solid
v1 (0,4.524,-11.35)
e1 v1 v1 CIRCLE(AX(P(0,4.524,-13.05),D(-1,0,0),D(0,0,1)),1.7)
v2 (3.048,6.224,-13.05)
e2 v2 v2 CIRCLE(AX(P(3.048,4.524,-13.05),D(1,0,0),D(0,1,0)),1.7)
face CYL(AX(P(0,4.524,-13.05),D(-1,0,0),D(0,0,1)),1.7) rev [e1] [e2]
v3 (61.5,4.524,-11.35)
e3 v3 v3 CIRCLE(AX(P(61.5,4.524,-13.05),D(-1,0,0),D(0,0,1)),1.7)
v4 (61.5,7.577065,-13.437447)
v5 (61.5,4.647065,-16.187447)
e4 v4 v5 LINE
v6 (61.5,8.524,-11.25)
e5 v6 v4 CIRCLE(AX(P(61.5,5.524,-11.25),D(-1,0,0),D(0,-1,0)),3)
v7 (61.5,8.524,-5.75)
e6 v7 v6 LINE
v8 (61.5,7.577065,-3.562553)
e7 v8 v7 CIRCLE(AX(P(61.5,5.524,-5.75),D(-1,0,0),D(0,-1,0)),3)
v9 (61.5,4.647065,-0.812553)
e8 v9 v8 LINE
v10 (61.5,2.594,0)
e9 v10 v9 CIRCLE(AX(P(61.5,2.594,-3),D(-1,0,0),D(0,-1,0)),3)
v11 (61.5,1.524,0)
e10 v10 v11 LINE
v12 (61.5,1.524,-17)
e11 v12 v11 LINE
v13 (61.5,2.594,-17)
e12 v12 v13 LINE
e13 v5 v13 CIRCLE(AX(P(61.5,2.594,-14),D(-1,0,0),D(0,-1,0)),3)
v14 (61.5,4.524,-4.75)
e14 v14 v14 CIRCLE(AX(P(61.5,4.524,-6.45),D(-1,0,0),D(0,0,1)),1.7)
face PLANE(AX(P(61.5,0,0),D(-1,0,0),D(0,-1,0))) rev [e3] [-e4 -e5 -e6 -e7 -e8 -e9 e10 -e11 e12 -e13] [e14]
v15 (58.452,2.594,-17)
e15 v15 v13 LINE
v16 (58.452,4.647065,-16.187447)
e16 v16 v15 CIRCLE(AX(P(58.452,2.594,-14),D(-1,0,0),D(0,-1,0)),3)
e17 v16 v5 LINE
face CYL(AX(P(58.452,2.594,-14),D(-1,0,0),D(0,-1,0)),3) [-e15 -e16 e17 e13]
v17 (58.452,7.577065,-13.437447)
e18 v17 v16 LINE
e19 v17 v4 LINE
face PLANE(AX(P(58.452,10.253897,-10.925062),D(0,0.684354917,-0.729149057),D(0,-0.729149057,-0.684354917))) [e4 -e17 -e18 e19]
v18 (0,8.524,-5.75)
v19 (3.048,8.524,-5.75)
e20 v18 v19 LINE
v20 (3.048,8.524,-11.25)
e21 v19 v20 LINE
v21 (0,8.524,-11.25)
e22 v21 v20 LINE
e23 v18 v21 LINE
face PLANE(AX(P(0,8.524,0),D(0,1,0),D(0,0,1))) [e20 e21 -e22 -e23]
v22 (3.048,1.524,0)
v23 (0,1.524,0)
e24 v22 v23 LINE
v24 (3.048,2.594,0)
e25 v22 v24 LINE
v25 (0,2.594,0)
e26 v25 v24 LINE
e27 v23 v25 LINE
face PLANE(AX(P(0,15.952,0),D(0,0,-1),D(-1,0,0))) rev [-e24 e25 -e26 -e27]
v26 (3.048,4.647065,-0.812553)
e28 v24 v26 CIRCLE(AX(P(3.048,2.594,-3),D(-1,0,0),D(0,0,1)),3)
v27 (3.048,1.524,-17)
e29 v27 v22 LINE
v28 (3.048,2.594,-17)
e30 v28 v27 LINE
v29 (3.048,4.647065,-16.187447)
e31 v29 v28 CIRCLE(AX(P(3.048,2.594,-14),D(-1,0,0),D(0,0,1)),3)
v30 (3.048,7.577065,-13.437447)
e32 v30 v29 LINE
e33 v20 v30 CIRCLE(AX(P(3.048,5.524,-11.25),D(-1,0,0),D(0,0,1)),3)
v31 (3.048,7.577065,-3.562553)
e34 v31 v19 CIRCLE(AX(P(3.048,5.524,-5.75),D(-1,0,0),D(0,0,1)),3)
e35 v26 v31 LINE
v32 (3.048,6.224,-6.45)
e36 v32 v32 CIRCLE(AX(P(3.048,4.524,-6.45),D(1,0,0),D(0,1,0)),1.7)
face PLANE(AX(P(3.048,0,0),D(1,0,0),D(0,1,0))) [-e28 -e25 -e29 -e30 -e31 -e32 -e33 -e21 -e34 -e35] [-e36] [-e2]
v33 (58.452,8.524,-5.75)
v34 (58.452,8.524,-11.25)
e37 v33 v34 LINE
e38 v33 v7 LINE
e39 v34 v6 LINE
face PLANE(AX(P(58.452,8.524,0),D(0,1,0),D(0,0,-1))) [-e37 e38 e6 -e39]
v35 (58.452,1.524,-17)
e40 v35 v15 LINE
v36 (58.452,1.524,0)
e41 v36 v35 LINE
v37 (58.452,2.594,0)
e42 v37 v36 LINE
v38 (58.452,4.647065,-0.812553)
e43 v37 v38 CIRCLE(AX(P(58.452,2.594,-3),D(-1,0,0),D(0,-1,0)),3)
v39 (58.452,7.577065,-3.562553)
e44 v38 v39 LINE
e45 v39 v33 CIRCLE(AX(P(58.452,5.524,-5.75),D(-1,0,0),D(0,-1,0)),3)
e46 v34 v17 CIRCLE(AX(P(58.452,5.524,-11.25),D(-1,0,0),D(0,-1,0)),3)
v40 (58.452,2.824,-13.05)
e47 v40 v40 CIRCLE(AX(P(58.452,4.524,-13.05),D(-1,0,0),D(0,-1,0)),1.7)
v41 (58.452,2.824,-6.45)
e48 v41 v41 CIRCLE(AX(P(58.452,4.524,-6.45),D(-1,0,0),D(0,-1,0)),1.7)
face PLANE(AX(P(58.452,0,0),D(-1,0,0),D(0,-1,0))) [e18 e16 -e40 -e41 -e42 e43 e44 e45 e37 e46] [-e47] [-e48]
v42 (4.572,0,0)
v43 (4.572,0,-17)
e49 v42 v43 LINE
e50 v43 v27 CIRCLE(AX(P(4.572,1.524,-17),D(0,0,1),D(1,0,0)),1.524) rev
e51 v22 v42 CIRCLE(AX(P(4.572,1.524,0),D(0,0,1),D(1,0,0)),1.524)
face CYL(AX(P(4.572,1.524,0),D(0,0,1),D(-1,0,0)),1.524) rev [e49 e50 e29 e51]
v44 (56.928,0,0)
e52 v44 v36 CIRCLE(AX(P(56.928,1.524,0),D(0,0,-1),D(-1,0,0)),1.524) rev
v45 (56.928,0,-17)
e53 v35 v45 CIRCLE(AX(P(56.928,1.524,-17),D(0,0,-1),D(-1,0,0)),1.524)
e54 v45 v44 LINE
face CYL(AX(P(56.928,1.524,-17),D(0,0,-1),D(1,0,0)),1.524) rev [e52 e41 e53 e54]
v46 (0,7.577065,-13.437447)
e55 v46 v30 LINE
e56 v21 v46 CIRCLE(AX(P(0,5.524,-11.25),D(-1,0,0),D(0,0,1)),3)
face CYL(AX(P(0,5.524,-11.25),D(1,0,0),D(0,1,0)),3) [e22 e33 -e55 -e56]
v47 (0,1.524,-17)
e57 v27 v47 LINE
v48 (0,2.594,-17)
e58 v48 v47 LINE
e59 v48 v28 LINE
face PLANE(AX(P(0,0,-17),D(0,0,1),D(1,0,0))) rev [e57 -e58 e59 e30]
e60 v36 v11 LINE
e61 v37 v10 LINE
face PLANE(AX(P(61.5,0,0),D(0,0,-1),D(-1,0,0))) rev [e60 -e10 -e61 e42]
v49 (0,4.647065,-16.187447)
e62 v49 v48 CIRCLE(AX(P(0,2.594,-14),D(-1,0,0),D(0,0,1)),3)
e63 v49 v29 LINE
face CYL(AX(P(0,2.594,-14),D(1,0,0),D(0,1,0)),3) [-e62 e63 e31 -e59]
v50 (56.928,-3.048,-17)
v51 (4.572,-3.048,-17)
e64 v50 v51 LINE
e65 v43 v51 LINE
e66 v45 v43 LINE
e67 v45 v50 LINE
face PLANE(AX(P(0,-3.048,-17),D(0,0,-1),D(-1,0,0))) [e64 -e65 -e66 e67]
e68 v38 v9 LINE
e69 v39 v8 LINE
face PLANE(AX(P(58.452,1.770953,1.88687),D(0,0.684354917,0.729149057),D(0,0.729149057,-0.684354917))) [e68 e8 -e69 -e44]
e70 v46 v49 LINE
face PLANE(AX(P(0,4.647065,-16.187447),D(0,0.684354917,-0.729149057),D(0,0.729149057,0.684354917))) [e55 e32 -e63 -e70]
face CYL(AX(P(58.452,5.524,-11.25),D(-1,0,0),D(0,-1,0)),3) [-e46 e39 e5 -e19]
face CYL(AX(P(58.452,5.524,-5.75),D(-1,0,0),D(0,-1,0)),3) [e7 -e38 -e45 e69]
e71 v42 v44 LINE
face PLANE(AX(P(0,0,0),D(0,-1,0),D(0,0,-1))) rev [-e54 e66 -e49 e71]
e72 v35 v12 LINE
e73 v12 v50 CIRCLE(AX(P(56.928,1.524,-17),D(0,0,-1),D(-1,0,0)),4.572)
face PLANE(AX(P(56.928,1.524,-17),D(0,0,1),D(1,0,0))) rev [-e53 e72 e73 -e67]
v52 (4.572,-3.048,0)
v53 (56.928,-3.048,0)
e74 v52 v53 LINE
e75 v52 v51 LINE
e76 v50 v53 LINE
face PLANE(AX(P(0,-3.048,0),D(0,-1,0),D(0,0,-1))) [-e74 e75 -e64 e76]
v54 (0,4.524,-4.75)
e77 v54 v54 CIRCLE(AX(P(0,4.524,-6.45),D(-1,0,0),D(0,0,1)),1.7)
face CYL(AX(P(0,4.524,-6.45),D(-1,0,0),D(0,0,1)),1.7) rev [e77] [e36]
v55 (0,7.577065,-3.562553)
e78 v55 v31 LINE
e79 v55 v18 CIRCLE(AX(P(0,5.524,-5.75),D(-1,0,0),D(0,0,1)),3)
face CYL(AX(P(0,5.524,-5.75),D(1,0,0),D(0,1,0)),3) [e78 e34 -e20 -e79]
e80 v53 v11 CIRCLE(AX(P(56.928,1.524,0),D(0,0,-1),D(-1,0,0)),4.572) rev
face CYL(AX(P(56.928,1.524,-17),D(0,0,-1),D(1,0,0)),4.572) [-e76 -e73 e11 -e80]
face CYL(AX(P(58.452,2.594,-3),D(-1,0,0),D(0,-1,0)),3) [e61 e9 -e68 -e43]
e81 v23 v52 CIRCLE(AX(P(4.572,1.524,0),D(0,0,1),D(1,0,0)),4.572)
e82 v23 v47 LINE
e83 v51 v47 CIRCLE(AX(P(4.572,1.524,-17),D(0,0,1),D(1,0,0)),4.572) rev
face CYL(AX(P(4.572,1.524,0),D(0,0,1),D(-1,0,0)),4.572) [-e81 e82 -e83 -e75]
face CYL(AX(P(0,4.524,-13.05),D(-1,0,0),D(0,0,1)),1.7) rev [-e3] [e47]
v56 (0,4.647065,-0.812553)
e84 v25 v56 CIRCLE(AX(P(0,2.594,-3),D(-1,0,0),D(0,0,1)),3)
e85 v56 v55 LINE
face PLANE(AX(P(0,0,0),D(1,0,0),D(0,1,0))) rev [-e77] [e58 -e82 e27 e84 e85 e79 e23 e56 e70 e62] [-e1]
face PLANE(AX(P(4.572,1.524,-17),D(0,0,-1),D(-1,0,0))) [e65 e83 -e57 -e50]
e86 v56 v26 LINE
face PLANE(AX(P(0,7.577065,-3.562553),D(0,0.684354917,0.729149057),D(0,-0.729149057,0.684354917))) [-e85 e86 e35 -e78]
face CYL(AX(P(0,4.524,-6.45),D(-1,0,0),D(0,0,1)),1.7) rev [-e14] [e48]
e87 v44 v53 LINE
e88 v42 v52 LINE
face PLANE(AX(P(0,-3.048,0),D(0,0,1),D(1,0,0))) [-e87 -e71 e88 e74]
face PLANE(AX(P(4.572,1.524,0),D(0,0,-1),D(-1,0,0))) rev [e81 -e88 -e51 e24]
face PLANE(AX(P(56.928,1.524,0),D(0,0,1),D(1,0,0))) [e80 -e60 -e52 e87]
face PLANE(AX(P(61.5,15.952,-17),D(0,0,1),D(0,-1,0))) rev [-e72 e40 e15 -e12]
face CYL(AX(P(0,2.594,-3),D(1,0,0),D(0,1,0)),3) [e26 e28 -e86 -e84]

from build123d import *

# Parameters (mm, degrees)
SKETCH20_W                     = 61.5
SKETCH20_H                     = 17
BASE_FLANGE1_DEPTH             = 3.048
EDGE_FLANGE1_STRIP_W           = 15.24
EDGE_FLANGE1_STRIP_H           = 3.048
EDGE_FLANGE1_STRIP_CUT_DEPTH   = 17
EDGE_FLANGE1_STRIP_2_W         = 15.24
EDGE_FLANGE1_STRIP_2_H         = 3.048
EDGE_FLANGE1_STRIP_CUT_2_DEPTH = 17
EDGE_FLANGE1_DEPTH             = 17
EDGE_FLANGE1_BEND_DEPTH        = 17
CUT_EXTRUDE3_DEPTH             = 66.770177923
CUT_EXTRUDE3_DEPTH_BACK        = 66.770177923
M3_CLEARANCE_HOLE1_D           = 3.4


# Sheet-metal steps are written as plain solids
with BuildPart() as part:
    # Sketch20 → Base-Flange1 (new body)
    with BuildSketch(Plane(origin=(0, 0, 0), x_dir=(1, 0, 0), z_dir=(0, 1, 0))):
        with Locations((30.75, 8.5)):
            Rectangle(SKETCH20_W, SKETCH20_H)
    extrude(amount=-BASE_FLANGE1_DEPTH)

    # Edge-Flange1 strip (across the edge) → Edge-Flange1 strip cut (cut)
    with BuildSketch(Plane.XY.offset(-17)):
        with Locations((-3.048, -1.524)):
            Rectangle(EDGE_FLANGE1_STRIP_W, EDGE_FLANGE1_STRIP_H)
    extrude(amount=EDGE_FLANGE1_STRIP_CUT_DEPTH, mode=Mode.SUBTRACT)

    # Edge-Flange1 strip 2 (across the edge) → Edge-Flange1 strip cut 2 (cut)
    with BuildSketch(Plane(origin=(61.5, 0, 0), x_dir=(-1, 0, 0), z_dir=(0, 0, -1))):
        with Locations((-3.048, -1.524)):
            Rectangle(EDGE_FLANGE1_STRIP_2_W, EDGE_FLANGE1_STRIP_2_H)
    extrude(amount=EDGE_FLANGE1_STRIP_CUT_2_DEPTH, mode=Mode.SUBTRACT)

    # Edge-Flange1 section (across the edge) → Edge-Flange1 (add)
    with BuildSketch(Plane.XY.offset(-17)):
        with BuildLine():
            Line((0, 1.524), (0, 15.952))
            Line((0, 15.952), (3.048, 15.952))
            Line((3.048, 15.952), (3.048, 1.524))
            ThreePointArc((3.048, 1.524), (3.494369265, 0.446369265), (4.572, 0))
            Line((4.572, 0), (4.572, -3.048))
            ThreePointArc((4.572, -3.048), (1.339107796, -1.708892204), (0, 1.524))
        make_face()
    extrude(amount=EDGE_FLANGE1_DEPTH)

    # Edge-Flange1 section 2 (across the edge) → Edge-Flange1 bend (add)
    with BuildSketch(Plane(origin=(61.5, 0, 0), x_dir=(-1, 0, 0), z_dir=(0, 0, -1))):
        with BuildLine():
            Line((0, 1.524), (0, 15.952))
            Line((0, 15.952), (3.048, 15.952))
            Line((3.048, 15.952), (3.048, 1.524))
            ThreePointArc((3.048, 1.524), (3.494369265, 0.446369265), (4.572, 0))
            Line((4.572, 0), (4.572, -3.048))
            ThreePointArc((4.572, -3.048), (1.339107796, -1.708892204), (0, 1.524))
        make_face()
    extrude(amount=EDGE_FLANGE1_BEND_DEPTH)

    # Sketch29 → Cut-Extrude3 (cut, two sides: drawn at the far end of the back side and taken through both)
    with BuildSketch(Plane(origin=(0, 0, 0), x_dir=(0, 0, -1), z_dir=(1, 0, 0)).offset(-CUT_EXTRUDE3_DEPTH_BACK)):
        with BuildLine():
            Line((0, 1.524), (0, 2.594))
            ThreePointArc((0, 2.594), (0.210525003, 3.698005998), (0.812552829, 4.647064751))
            Line((0.812552829, 4.647064751), (3.562552829, 7.577064751))
            ThreePointArc((3.562552829, 7.577064751), (4.558193441, 8.277106814), (5.75, 8.524))
            Line((5.75, 8.524), (11.25, 8.524))
            ThreePointArc((11.25, 8.524), (12.441806559, 8.277106814), (13.437447171, 7.577064751))
            Line((13.437447171, 7.577064751), (16.187447171, 4.647064751))
            ThreePointArc((16.187447171, 4.647064751), (16.789474997, 3.698005998), (17, 2.594))
            Line((17, 2.594), (17, 1.524))
            Line((17, 1.524), (21.797856885, 1.524))
            Line((21.797856885, 1.524), (21.797856885, 17.003274098))
            Line((21.797856885, 17.003274098), (-4.797856885, 17.003274098))
            Line((-4.797856885, 17.003274098), (-4.797856885, 1.524))
            Line((-4.797856885, 1.524), (0, 1.524))
        make_face()
    extrude(amount=CUT_EXTRUDE3_DEPTH + CUT_EXTRUDE3_DEPTH_BACK, mode=Mode.SUBTRACT)

    # M3 Clearance Hole1 (through all)
    with Locations(Plane(origin=(0, 4.524, -13.05), x_dir=(0, -1, 0), z_dir=(-1, 0, 0))):
        with Locations((0, 0), (0, 6.6)):
            Hole(M3_CLEARANCE_HOLE1_D / 2)


solid = part.part
